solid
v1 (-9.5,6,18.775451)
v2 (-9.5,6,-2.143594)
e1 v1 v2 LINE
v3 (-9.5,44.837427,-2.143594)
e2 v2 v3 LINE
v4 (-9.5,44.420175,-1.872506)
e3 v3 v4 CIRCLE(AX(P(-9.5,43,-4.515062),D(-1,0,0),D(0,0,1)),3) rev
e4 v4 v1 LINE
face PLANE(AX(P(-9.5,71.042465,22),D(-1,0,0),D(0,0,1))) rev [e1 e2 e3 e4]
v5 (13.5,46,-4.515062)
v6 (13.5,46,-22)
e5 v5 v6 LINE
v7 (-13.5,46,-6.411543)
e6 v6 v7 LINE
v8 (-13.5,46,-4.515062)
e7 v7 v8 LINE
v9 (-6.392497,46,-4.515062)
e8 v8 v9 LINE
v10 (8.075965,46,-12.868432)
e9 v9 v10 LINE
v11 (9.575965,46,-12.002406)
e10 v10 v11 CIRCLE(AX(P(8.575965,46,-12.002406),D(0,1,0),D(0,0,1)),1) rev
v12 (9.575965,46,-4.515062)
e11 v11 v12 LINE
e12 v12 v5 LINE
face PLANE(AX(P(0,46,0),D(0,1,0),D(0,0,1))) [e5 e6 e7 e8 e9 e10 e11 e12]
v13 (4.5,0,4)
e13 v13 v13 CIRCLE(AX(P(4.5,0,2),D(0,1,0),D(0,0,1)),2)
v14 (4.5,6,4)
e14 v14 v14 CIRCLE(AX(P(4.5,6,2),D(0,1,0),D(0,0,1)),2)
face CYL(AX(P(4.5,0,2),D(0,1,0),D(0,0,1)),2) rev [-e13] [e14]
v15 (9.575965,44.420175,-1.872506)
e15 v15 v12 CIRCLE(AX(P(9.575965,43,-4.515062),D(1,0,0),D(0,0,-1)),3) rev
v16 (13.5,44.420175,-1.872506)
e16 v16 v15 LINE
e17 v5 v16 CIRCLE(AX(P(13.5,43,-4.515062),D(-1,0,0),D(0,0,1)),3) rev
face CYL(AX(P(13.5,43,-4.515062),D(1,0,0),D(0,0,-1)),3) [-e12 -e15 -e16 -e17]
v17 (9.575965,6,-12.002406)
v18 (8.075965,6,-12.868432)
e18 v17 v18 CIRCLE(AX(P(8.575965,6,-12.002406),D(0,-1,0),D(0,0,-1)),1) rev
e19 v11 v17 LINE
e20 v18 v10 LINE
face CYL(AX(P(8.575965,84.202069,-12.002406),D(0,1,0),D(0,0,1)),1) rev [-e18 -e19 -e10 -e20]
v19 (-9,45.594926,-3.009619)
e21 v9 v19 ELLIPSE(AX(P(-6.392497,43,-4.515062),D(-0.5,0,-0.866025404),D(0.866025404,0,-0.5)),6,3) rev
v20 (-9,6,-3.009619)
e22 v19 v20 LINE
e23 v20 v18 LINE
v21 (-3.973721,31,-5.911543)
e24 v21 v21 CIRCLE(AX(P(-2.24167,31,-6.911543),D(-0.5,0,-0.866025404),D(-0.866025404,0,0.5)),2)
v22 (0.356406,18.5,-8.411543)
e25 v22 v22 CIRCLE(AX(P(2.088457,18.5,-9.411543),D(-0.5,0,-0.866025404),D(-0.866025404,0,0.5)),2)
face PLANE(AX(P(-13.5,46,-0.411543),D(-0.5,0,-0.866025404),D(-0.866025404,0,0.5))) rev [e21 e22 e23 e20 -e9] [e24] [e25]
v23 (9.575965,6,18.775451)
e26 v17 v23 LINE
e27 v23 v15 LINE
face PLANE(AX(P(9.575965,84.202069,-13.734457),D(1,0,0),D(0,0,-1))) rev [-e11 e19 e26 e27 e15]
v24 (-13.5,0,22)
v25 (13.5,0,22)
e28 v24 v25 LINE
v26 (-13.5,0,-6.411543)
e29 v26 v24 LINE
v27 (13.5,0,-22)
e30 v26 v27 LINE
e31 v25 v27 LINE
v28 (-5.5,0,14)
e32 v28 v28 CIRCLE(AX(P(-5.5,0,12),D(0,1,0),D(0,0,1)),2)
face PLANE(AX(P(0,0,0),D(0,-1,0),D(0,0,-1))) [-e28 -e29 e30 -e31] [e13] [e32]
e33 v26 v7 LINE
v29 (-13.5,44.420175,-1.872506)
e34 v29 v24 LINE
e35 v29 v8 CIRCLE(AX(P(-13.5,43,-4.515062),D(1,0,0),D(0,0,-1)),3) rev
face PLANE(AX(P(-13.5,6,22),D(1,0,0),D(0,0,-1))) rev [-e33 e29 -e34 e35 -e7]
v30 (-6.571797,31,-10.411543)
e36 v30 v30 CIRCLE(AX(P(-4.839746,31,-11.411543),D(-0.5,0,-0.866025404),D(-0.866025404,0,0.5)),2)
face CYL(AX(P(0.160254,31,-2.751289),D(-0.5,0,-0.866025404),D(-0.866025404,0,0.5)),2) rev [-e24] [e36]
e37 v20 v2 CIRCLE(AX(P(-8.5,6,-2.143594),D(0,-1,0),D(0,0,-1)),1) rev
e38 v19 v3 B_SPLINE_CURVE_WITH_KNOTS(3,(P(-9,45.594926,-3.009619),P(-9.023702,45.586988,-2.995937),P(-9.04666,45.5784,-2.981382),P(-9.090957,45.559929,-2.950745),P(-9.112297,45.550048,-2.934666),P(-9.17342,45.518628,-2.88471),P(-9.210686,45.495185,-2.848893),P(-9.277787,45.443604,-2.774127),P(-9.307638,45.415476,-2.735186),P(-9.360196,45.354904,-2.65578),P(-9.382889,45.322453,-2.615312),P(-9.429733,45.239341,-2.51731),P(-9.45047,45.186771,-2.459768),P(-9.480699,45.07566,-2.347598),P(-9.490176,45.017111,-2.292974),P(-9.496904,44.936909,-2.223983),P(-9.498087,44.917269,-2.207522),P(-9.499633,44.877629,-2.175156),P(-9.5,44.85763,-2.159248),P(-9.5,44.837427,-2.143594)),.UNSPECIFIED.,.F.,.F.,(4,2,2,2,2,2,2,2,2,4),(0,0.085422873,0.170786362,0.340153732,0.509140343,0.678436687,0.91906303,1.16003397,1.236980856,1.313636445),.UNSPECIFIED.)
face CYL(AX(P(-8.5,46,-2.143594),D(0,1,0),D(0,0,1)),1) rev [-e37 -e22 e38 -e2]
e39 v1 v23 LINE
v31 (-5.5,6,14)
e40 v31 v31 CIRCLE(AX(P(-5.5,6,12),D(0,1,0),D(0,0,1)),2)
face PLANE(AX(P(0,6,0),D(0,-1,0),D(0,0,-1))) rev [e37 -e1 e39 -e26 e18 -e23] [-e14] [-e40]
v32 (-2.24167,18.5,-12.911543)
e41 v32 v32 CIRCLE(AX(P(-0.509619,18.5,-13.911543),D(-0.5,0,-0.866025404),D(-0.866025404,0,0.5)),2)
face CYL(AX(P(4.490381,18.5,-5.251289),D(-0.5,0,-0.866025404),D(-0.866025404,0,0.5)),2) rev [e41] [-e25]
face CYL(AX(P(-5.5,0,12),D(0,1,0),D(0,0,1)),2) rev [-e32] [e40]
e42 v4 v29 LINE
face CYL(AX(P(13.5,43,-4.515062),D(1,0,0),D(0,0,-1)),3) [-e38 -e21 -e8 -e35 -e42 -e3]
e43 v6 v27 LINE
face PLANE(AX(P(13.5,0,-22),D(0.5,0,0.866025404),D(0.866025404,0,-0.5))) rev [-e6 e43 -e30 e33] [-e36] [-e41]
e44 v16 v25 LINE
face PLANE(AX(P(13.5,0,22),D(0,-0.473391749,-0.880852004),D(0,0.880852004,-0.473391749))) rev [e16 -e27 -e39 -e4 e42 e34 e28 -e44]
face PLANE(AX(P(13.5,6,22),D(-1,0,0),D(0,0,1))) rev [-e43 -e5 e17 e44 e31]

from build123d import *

# Parameters (mm, degrees)
SKETCH1_W           = 27
SKETCH1_H           = 44
BOSS_EXTRUDE1_DEPTH = 6
CUT_EXTRUDE1_DEPTH  = 27.5
BOSS_EXTRUDE2_DEPTH = 40
BOSS_EXTRUDE3_DEPTH = 40
BOSS_EXTRUDE5_DEPTH = 40
SKETCH6_R           = 2
CUT_EXTRUDE2_DEPTH  = 10
CUT_EXTRUDE3_DEPTH  = 58.697486947
FILLET1_R           = 1
SKETCH5_R           = 2
CUT_EXTRUDE4_DEPTH  = 48.605146781
FILLET2_R           = 3


with BuildPart() as part:
    # Sketch1 → Boss-Extrude1 (new body)
    with BuildSketch(Plane(origin=(0, 0, 0), x_dir=(1, 0, 0), z_dir=(0, 1, 0))):
        Rectangle(SKETCH1_W, SKETCH1_H)
    extrude(amount=BOSS_EXTRUDE1_DEPTH)

    # Sketch2 → Cut-Extrude1 (cut, through all)
    with BuildSketch(Plane(origin=(0, 6, 0), x_dir=(1, 0, 0), z_dir=(0, 1, 0))):
        Polygon((13.5, 22), (-13.5, 6.411542732), (-13.5, 22), align=None)
    extrude(amount=-CUT_EXTRUDE1_DEPTH, mode=Mode.SUBTRACT)

    # Sketch4 → Boss-Extrude2 (add)
    with BuildSketch(Plane(origin=(0, 6, 0), x_dir=(1, 0, 0), z_dir=(0, 1, 0))):
        Polygon((-13.5, 6.411542732), (-13.5, 0.411542732), (13.5, 16), (13.5, 22), align=None)
    extrude(amount=BOSS_EXTRUDE2_DEPTH)

    # Sketch18 → Boss-Extrude3 (add)
    with BuildSketch(Plane(origin=(0, 6, 0), x_dir=(1, 0, 0), z_dir=(0, 1, 0))):
        Polygon((-13.5, -22), (-9.5, -22), (-9.5, 2.720943809), (-13.5, 0.411542732), align=None)
    extrude(amount=BOSS_EXTRUDE3_DEPTH)

    # Sketch19 → Boss-Extrude5 (add)
    with BuildSketch(Plane(origin=(0, 6, 0), x_dir=(1, 0, 0), z_dir=(0, 1, 0))):
        Polygon((13.5, 16), (9.575964778, 13.734457208), (9.575964778, -22), (13.5, -22), align=None)
    extrude(amount=BOSS_EXTRUDE5_DEPTH)

    # Sketch6 → Cut-Extrude2 (cut)
    with BuildSketch(Plane(origin=(-6.151279442, 0, -10.654328524), x_dir=(-0.8660254037844417, 0, 0.4999999999999949), z_dir=(-0.4999999999999949, 0, -0.8660254037844417))):
        with Locations((-6.514428415, 18.5)):
            Circle(SKETCH6_R)
        with Locations((-1.514428415, 31)):
            Circle(SKETCH6_R)
    extrude(amount=-CUT_EXTRUDE2_DEPTH, mode=Mode.SUBTRACT)

    # Sketch20 → Cut-Extrude3 (cut, through all)
    with BuildSketch(Plane.ZY.offset(13.5)):
        Polygon((22, 0), (-2.721542732, 46), (22, 46), align=None)
    extrude(amount=-CUT_EXTRUDE3_DEPTH, mode=Mode.SUBTRACT)

    # Fillet1
    # the kernel refuses this fillet: 1 mm, written as the material it adds along each edge
    with BuildSketch(Plane(origin=(-9.5, 4.556624327, -2.720943809), x_dir=(0.8660254037844415, 0, -0.4999999999999951), z_dir=(0, 1, 0))) as fillet1_piece_1_section:
        with BuildLine():
            CenterArc((FILLET1_R * 0.57735026919, -FILLET1_R), FILLET1_R, 90, 60)
            Line((-FILLET1_R * 0.288675134595, -FILLET1_R * 0.5), (0, 0))
            Line((0, 0), (FILLET1_R * 0.57735026919, 0))
        make_face()
    fillet1_piece_1 = extrude(amount=42.885636914, mode=Mode.PRIVATE)
    fillet1_piece_1 = split(fillet1_piece_1, bisect_by=Plane(origin=(-9.391668289, 14.377701734, 14.273065917), z_dir=(0, -0.47339174882638807, -0.8808520035415109)), keep=Keep.TOP, mode=Mode.PRIVATE)
    fillet1_piece_1 = split(fillet1_piece_1, bisect_by=Plane(origin=(-9.391668289, 46, -2.658398466), z_dir=(0, -1, 0)), keep=Keep.TOP, mode=Mode.PRIVATE)
    add(fillet1_piece_1)
    with BuildSketch(Plane(origin=(9.575964778, 1.669872981, -13.734457208), x_dir=(-0.8660254037844415, 0, 0.4999999999999951), z_dir=(0, 1, 0))) as fillet1_piece_2:
        with BuildLine():
            CenterArc((FILLET1_R * 1.73205080757, FILLET1_R), FILLET1_R, 150, 120)
            Line((FILLET1_R * 0.866025403784, FILLET1_R * 1.5), (0, 0))
            Line((0, 0), (FILLET1_R * 1.73205080757, 0))
        make_face()
    extrude(amount=44.330127019)

    # Sketch5 → Cut-Extrude4 (cut, through all)
    with BuildSketch(Plane(origin=(0, 6, 0), x_dir=(1, 0, 0), z_dir=(0, 1, 0))):
        with Locations(Location((-5.5, -12, 0), (0, 0, 270))):
            Circle(SKETCH5_R)
        with Locations(Location((4.5, -2, 0), (0, 0, 270))):
            Circle(SKETCH5_R)
    extrude(amount=-CUT_EXTRUDE4_DEPTH, mode=Mode.SUBTRACT)

    # Fillet2
    # the kernel refuses this fillet: 3 mm, written as the material it takes off along each edge
    with BuildSketch(Plane(origin=(5.092167423, 46, -2.721542732), x_dir=(0, 0, -1), z_dir=(1, 0, 0))) as fillet2_piece_1:
        with BuildLine():
            CenterArc((FILLET2_R * 0.59783964736, -FILLET2_R), FILLET2_R, 90, 61.74531149)
            Line((-FILLET2_R * 0.283012356181, -FILLET2_R * 0.526608251174), (0, 0))
            Line((0, 0), (FILLET2_R * 0.59783964736, 0))
        make_face()
    extrude(amount=12.891629932, mode=Mode.SUBTRACT)
    with BuildSketch(Plane(origin=(-17.983797355, 46, -2.721542732), x_dir=(0, 0, -1), z_dir=(1, 0, 0))) as fillet2_piece_2:
        with BuildLine():
            CenterArc((FILLET2_R * 0.59783964736, -FILLET2_R), FILLET2_R, 90, 61.74531149)
            Line((-FILLET2_R * 0.283012356181, -FILLET2_R * 0.526608251174), (0, 0))
            Line((0, 0), (FILLET2_R * 0.59783964736, 0))
        make_face()
    extrude(amount=8.484834721, mode=Mode.SUBTRACT)
    with BuildSketch(Plane(origin=(-4.832275393, 46, -2.721542732), x_dir=(0, 0, -1), z_dir=(-1, 0, 0))) as fillet2_piece_3:
        with BuildLine():
            CenterArc((FILLET2_R * 0.59783964736, FILLET2_R), FILLET2_R, 208.25468851, 61.74531149)
            Line((-FILLET2_R * 0.283012356181, FILLET2_R * 0.526608251174), (0, 0))
            Line((0, 0), (FILLET2_R * 0.59783964736, 0))
        make_face()
    extrude(amount=4.666687241, mode=Mode.SUBTRACT)


solid = part.part
